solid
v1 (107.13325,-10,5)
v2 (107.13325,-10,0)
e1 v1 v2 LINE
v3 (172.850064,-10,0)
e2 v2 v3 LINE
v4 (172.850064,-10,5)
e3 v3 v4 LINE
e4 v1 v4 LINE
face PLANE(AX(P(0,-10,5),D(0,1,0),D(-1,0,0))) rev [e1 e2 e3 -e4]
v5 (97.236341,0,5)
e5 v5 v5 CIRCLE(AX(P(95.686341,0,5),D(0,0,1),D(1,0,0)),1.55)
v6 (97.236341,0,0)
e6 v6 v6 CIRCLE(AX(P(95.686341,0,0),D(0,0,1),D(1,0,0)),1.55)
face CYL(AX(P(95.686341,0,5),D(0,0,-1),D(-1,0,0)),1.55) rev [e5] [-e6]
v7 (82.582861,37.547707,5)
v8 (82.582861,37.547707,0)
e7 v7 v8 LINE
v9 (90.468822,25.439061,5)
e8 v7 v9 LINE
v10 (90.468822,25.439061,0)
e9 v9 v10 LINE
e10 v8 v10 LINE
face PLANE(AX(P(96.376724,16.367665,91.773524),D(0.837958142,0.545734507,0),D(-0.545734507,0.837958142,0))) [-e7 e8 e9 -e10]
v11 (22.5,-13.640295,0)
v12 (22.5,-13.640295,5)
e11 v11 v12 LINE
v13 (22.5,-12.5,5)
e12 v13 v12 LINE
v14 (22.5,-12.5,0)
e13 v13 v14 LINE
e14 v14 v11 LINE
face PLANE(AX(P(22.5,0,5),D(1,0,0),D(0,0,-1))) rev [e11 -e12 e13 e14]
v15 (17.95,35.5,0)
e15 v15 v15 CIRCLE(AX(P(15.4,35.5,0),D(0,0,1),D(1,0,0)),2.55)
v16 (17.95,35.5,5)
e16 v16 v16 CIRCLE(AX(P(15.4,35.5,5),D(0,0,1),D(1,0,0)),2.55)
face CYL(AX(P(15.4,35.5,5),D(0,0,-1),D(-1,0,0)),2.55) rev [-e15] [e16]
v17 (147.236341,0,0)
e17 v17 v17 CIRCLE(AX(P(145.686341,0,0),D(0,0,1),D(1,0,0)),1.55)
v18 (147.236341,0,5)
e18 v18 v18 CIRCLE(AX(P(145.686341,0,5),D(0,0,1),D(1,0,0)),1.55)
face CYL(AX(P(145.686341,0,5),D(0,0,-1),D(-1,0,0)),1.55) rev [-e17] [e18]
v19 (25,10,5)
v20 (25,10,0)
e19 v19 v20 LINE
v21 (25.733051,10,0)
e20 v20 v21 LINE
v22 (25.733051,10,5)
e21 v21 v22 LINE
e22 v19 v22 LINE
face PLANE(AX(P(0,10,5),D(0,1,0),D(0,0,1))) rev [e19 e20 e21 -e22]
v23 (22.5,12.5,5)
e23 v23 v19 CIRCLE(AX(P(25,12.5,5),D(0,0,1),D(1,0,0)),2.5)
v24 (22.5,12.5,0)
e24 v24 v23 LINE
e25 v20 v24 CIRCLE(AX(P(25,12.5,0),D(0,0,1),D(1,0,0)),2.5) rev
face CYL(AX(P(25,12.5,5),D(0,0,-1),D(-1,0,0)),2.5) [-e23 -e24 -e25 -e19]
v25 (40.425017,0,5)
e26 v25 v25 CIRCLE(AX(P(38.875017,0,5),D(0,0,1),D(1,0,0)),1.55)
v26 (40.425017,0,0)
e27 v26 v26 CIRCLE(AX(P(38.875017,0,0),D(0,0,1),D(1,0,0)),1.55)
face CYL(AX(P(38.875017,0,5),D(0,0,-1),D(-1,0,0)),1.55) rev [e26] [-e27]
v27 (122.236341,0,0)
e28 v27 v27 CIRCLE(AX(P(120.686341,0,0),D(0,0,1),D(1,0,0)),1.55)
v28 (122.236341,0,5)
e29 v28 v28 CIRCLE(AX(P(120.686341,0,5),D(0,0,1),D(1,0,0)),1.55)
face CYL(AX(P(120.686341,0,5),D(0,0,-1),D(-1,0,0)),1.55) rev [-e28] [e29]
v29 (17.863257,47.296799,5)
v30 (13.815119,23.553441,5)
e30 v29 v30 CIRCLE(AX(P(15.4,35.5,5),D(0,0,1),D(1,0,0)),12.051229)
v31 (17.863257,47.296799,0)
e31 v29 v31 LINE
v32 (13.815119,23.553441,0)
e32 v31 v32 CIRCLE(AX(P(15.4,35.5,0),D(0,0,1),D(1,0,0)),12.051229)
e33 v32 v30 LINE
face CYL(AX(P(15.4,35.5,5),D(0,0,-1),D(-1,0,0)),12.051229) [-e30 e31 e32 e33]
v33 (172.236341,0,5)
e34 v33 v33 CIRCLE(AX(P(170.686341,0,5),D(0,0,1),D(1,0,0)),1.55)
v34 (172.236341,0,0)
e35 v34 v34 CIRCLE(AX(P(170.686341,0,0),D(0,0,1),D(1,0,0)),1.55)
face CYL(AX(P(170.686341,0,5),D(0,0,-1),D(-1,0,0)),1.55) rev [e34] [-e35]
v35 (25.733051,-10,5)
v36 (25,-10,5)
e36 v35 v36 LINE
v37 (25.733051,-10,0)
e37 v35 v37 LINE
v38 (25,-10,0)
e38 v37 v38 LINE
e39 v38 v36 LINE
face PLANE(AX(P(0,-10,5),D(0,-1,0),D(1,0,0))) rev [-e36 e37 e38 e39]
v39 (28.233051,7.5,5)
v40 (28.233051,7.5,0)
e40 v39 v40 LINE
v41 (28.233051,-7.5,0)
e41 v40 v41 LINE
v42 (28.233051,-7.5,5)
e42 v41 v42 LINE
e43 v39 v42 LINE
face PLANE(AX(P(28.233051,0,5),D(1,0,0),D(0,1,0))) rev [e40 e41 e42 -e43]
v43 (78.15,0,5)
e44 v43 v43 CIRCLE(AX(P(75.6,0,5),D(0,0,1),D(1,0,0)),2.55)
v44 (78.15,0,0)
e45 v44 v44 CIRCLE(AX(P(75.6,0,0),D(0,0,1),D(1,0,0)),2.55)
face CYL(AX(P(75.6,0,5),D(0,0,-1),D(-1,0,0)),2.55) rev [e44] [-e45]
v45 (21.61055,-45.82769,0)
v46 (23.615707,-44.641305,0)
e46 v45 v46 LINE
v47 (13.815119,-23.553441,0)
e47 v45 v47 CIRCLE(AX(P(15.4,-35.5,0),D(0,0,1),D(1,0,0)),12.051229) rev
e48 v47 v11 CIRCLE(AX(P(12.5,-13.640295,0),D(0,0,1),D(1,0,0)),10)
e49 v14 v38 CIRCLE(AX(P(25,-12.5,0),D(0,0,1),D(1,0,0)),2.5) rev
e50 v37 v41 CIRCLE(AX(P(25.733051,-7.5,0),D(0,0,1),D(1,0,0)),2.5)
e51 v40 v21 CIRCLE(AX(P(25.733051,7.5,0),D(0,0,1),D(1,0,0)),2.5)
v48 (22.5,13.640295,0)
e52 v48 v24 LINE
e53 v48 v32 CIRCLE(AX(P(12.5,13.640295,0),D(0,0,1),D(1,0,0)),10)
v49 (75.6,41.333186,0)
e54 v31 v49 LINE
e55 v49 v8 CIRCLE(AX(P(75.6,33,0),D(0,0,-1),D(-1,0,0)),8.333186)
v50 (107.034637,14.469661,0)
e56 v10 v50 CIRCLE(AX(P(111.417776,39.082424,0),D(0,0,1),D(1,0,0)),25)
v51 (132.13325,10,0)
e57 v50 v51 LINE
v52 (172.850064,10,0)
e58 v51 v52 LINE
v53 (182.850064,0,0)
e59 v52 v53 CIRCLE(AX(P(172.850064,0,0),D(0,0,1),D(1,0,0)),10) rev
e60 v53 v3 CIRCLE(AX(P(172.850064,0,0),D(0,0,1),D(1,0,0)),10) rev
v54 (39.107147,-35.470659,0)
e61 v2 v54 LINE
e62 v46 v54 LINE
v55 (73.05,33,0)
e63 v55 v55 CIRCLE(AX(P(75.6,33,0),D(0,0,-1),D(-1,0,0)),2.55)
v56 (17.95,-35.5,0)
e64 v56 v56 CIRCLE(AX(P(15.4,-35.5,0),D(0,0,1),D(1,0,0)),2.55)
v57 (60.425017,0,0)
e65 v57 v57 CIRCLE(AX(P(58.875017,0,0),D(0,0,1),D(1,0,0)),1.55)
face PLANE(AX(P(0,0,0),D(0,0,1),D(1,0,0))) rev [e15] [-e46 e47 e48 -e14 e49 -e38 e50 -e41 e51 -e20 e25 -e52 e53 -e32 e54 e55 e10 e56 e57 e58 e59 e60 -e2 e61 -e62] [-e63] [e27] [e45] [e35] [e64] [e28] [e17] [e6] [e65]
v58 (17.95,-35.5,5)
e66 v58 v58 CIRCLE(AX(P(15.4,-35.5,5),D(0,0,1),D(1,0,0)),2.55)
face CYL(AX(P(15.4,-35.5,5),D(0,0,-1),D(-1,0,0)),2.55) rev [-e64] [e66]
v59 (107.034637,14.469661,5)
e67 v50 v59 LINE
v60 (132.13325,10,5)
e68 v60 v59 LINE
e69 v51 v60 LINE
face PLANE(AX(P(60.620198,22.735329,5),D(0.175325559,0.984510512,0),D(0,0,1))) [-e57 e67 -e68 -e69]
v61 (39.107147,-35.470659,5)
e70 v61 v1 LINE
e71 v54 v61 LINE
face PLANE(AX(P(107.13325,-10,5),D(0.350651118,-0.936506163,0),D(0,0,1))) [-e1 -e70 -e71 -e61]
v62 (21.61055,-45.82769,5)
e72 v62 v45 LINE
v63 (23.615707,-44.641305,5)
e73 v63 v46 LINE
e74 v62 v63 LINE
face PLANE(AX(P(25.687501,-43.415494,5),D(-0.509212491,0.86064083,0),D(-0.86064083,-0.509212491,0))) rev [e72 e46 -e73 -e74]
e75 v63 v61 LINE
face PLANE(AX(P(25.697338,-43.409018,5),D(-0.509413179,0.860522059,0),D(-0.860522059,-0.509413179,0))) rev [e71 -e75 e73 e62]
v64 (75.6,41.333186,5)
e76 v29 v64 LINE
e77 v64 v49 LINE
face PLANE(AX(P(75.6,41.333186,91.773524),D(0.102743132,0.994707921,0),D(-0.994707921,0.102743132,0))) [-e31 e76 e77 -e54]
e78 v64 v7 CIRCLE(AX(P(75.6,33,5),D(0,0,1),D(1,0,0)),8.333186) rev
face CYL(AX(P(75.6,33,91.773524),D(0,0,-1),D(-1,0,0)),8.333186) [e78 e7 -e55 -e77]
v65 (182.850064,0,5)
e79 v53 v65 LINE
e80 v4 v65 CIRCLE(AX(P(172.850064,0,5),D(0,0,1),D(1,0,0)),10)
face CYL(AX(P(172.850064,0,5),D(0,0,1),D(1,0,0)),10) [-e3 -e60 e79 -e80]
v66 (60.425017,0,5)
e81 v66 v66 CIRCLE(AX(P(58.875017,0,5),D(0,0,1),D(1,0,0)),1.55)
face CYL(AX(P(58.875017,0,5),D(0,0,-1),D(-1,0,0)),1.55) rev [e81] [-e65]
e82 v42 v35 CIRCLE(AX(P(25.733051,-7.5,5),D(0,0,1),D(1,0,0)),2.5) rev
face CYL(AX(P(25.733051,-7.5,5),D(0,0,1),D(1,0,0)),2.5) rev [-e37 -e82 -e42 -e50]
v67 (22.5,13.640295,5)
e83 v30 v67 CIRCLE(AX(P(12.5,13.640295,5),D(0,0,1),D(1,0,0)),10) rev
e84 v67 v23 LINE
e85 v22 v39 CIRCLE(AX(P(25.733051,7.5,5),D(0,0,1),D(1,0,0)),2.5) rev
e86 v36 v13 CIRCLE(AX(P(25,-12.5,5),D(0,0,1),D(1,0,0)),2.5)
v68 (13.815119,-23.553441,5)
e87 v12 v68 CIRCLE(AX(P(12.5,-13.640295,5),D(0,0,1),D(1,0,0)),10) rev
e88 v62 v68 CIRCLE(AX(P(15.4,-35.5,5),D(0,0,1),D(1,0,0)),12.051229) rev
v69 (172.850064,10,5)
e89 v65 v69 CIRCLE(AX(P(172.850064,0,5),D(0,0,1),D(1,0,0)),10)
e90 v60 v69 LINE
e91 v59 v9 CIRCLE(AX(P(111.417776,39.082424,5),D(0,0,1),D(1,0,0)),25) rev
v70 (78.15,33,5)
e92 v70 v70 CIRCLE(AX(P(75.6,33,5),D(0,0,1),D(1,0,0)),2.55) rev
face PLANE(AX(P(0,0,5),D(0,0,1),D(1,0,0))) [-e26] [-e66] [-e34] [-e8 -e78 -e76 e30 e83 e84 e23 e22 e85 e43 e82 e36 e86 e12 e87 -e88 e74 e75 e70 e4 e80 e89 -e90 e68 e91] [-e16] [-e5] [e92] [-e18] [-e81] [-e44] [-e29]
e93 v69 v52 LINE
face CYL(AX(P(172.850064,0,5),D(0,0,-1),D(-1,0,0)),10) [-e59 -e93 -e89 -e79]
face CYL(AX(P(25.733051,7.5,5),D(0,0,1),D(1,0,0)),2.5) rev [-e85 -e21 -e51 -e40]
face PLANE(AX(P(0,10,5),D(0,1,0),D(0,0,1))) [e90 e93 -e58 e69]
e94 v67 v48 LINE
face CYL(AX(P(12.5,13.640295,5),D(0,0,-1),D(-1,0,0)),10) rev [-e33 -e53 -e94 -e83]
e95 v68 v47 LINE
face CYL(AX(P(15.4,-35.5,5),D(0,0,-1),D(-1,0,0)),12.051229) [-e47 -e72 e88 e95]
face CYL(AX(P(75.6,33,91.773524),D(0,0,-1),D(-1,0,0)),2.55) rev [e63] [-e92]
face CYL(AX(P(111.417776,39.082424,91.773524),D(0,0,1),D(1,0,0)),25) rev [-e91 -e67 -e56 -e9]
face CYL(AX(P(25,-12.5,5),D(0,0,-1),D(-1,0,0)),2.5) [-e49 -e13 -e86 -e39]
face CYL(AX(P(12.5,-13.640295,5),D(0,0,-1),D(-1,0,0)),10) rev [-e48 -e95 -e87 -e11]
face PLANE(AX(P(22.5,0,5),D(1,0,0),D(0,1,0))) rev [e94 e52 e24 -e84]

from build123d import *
from OCP.BRepFilletAPI import BRepFilletAPI_MakeChamfer

# Parameters (mm, degrees)
CROQUIS1_R              = 1.549999999999994
CROQUIS1_R_2            = 2.5499999999999923
CROQUIS1_R_3            = 2.5500000000020107
CROQUIS1_R_4            = 2.5499999999987524
CROQUIS1_R_5            = 1.5500000000000012
SALIENTE_EXTRUIR1_DEPTH = 5
REDONDEO1_R             = 10
REDONDEO2_R             = 10
REDONDEO4_R             = 2.5
CHAFL_N1_SIZE           = 50
CHAFL_N1_SIZE2          = 25
CROQUIS2_R              = 2.5499999999999914
SALIENTE_EXTRUIR2_DEPTH = 5
REDONDEO5_R             = 25


with BuildPart() as part:
    # Croquis1 → Saliente-Extruir1 (new body)
    with BuildSketch(Plane.XY):
        with BuildLine():
            Line((22.499999999999602, 23.448771432804598), (22.499999999999606, 10.00000000000557))
            Line((22.499999999999606, 10.00000000000557), (28.23305122348206, 10.00000000000557))
            Line((28.23305122348206, 10.00000000000557), (28.233051223482065, -9.999999999994426))
            Line((28.233051223482065, -9.999999999994426), (22.49999999999961, -9.99999999999443))
            Line((22.49999999999961, -9.99999999999443), (22.49999999999961, -20.499999999994426))
            Line((22.49999999999961, -20.499999999994426), (22.49999999999961, -23.448771432804598))
            Line((22.49999999999961, -23.448771432804598), (15.3999999999996, -23.448771432804598))
            ThreePointArc((15.3999999999996, -23.448771432804598), (3.787647475656714, -38.722635385727685), (21.610549895016423, -45.827689963420795))
            Line((21.610549895016423, -45.827689963420795), (23.615707001015654, -44.64130534237437))
            Line((23.615707001015654, -44.64130534237437), (79.74064487017472, -11.416377836244111))
            Line((79.74064487017472, -11.416377836244111), (82.13324958071296, -10))
            Line((82.13324958071296, -10), (182.8500644459697, -9.999999999999998))
            Line((182.8500644459697, -9.999999999999998), (182.8500644459697, 9.999999999999998))
            Line((182.8500644459697, 9.999999999999998), (87.50000000000001, 9.999999999999998))
            Line((87.50000000000001, 9.999999999999998), (82.13324958071296, 9.999999999999998))
            Line((82.13324958071296, 9.999999999999998), (23.615707001015654, 44.64130534237437))
            Line((23.615707001015654, 44.64130534237437), (21.610549895016423, 45.827689963420795))
            ThreePointArc((21.610549895016423, 45.827689963420795), (3.787647475656714, 38.722635385727685), (15.3999999999996, 23.448771432804598))
            Line((15.3999999999996, 23.448771432804598), (22.499999999999602, 23.448771432804598))
        make_face()
        with Locations((170.68634124367938, 0)):
            Circle(CROQUIS1_R, mode=Mode.SUBTRACT)
        with Locations((75.6, 0)):
            Circle(CROQUIS1_R_2, mode=Mode.SUBTRACT)
        with Locations((15.3999999999996, -35.50000000000558)):
            Circle(CROQUIS1_R_3, mode=Mode.SUBTRACT)
        with Locations((15.3999999999996, 35.50000000000558)):
            Circle(CROQUIS1_R_4, mode=Mode.SUBTRACT)
        with Locations((95.6863412436794, 0)):
            Circle(CROQUIS1_R, mode=Mode.SUBTRACT)
        with Locations((145.68634124367938, 0)):
            Circle(CROQUIS1_R, mode=Mode.SUBTRACT)
        with Locations((120.68634124367938, 0)):
            Circle(CROQUIS1_R, mode=Mode.SUBTRACT)
        with Locations((38.875017115898416, 0)):
            Circle(CROQUIS1_R_5, mode=Mode.SUBTRACT)
        with Locations((58.875017115898416, -1.73e-15)):
            Circle(CROQUIS1_R_5, mode=Mode.SUBTRACT)
    extrude(amount=SALIENTE_EXTRUIR1_DEPTH)

    # Redondeo1
    redondeo1_edges = [part.edges().sort_by_distance(p)[0] for p in [
        (22.49999999999961, -23.448771432804598, 2.5),
        (22.499999999999602, 23.448771432804598, 2.5),
    ]]
    fillet(redondeo1_edges, radius=REDONDEO1_R)

    # Redondeo2
    redondeo2_edges = [part.edges().sort_by_distance(p)[0] for p in [
        (182.8500644459697, -9.999999999999998, 2.5),
        (182.8500644459697, 9.999999999999998, 2.5),
    ]]
    fillet(redondeo2_edges, radius=REDONDEO2_R - 0.0001)  # a hair under: the kernel refuses the full size

    # Redondeo4
    redondeo4_edges = [part.edges().sort_by_distance(p)[0] for p in [
        (22.49999999999961, -9.99999999999443, 2.5),
        (28.233051223482065, -9.999999999994426, 2.5),
        (28.23305122348206, 10.00000000000557, 2.5),
        (22.499999999999606, 10.00000000000557, 2.5),
    ]]
    fillet(redondeo4_edges, radius=REDONDEO4_R)

    # Chaflán1: one chamfer whose edges measure the first distance from different faces: ONE call of the kernel's chamfer builder (chamfer() names one face for all edges)
    chafl_n1_edges_1 = [part.edges().sort_by_distance(p)[0] for p in [
        (82.13324958071296, 9.999999999999998, 2.5),
    ]]
    chafl_n1_side_1 = [part.faces().sort_by_distance(p)[0] for p in [
        (127.49170701334134, 9.999999999999998, 2.5),
    ]]
    chafl_n1_edges_2 = [part.edges().sort_by_distance(p)[0] for p in [
        (82.13324958071296, -10, 2.5),
    ]]
    chafl_n1_side_2 = [part.faces().sort_by_distance(p)[0] for p in [
        (52.874478290864296, -27.320652671187155, 2.5),
    ]]
    chafl_n1 = BRepFilletAPI_MakeChamfer(part.part.solid().wrapped)
    for e in chafl_n1_edges_1:
        chafl_n1.Add(CHAFL_N1_SIZE, CHAFL_N1_SIZE2, e.wrapped, chafl_n1_side_1[0].wrapped)  # the first distance lies on this face
    for e in chafl_n1_edges_2:
        chafl_n1.Add(CHAFL_N1_SIZE, CHAFL_N1_SIZE2, e.wrapped, chafl_n1_side_2[0].wrapped)  # the first distance lies on this face
    add(Compound.cast(chafl_n1.Shape()), mode=Mode.REPLACE)

    # Croquis2 → Saliente-Extruir2 (add)
    with BuildSketch(Plane(origin=(0, 0, 0), x_dir=(-1, 0, 0), z_dir=(0, 0, -1))):
        with BuildLine():
            Line((-96.37672384904373, 16.36766473551684), (-82.582860744419, 37.547706950275206))
            ThreePointArc((-82.582860744419, 37.547706950275206), (-79.57146676248833, 40.32594256297316), (-75.59999999999961, 41.33318562624969))
            Line((-75.59999999999961, 41.33318562624969), (-15.399999999999643, 47.55122856720654))
            Line((-15.399999999999643, 47.55122856720654), (-60.62019811737546, 22.735329471033683))
            Line((-60.62019811737546, 22.735329471033683), (-96.37672384904373, 16.36766473551684))
        make_face()
        with Locations((-75.59999999999961, 33)):
            Circle(CROQUIS2_R, mode=Mode.SUBTRACT)
    extrude(amount=-SALIENTE_EXTRUIR2_DEPTH)

    # Redondeo5
    redondeo5_edges = [part.edges().sort_by_distance(p)[0] for p in [
        (96.37672384904373, 16.36766473551684, 2.5),
    ]]
    fillet(redondeo5_edges, radius=REDONDEO5_R)


solid = part.part
